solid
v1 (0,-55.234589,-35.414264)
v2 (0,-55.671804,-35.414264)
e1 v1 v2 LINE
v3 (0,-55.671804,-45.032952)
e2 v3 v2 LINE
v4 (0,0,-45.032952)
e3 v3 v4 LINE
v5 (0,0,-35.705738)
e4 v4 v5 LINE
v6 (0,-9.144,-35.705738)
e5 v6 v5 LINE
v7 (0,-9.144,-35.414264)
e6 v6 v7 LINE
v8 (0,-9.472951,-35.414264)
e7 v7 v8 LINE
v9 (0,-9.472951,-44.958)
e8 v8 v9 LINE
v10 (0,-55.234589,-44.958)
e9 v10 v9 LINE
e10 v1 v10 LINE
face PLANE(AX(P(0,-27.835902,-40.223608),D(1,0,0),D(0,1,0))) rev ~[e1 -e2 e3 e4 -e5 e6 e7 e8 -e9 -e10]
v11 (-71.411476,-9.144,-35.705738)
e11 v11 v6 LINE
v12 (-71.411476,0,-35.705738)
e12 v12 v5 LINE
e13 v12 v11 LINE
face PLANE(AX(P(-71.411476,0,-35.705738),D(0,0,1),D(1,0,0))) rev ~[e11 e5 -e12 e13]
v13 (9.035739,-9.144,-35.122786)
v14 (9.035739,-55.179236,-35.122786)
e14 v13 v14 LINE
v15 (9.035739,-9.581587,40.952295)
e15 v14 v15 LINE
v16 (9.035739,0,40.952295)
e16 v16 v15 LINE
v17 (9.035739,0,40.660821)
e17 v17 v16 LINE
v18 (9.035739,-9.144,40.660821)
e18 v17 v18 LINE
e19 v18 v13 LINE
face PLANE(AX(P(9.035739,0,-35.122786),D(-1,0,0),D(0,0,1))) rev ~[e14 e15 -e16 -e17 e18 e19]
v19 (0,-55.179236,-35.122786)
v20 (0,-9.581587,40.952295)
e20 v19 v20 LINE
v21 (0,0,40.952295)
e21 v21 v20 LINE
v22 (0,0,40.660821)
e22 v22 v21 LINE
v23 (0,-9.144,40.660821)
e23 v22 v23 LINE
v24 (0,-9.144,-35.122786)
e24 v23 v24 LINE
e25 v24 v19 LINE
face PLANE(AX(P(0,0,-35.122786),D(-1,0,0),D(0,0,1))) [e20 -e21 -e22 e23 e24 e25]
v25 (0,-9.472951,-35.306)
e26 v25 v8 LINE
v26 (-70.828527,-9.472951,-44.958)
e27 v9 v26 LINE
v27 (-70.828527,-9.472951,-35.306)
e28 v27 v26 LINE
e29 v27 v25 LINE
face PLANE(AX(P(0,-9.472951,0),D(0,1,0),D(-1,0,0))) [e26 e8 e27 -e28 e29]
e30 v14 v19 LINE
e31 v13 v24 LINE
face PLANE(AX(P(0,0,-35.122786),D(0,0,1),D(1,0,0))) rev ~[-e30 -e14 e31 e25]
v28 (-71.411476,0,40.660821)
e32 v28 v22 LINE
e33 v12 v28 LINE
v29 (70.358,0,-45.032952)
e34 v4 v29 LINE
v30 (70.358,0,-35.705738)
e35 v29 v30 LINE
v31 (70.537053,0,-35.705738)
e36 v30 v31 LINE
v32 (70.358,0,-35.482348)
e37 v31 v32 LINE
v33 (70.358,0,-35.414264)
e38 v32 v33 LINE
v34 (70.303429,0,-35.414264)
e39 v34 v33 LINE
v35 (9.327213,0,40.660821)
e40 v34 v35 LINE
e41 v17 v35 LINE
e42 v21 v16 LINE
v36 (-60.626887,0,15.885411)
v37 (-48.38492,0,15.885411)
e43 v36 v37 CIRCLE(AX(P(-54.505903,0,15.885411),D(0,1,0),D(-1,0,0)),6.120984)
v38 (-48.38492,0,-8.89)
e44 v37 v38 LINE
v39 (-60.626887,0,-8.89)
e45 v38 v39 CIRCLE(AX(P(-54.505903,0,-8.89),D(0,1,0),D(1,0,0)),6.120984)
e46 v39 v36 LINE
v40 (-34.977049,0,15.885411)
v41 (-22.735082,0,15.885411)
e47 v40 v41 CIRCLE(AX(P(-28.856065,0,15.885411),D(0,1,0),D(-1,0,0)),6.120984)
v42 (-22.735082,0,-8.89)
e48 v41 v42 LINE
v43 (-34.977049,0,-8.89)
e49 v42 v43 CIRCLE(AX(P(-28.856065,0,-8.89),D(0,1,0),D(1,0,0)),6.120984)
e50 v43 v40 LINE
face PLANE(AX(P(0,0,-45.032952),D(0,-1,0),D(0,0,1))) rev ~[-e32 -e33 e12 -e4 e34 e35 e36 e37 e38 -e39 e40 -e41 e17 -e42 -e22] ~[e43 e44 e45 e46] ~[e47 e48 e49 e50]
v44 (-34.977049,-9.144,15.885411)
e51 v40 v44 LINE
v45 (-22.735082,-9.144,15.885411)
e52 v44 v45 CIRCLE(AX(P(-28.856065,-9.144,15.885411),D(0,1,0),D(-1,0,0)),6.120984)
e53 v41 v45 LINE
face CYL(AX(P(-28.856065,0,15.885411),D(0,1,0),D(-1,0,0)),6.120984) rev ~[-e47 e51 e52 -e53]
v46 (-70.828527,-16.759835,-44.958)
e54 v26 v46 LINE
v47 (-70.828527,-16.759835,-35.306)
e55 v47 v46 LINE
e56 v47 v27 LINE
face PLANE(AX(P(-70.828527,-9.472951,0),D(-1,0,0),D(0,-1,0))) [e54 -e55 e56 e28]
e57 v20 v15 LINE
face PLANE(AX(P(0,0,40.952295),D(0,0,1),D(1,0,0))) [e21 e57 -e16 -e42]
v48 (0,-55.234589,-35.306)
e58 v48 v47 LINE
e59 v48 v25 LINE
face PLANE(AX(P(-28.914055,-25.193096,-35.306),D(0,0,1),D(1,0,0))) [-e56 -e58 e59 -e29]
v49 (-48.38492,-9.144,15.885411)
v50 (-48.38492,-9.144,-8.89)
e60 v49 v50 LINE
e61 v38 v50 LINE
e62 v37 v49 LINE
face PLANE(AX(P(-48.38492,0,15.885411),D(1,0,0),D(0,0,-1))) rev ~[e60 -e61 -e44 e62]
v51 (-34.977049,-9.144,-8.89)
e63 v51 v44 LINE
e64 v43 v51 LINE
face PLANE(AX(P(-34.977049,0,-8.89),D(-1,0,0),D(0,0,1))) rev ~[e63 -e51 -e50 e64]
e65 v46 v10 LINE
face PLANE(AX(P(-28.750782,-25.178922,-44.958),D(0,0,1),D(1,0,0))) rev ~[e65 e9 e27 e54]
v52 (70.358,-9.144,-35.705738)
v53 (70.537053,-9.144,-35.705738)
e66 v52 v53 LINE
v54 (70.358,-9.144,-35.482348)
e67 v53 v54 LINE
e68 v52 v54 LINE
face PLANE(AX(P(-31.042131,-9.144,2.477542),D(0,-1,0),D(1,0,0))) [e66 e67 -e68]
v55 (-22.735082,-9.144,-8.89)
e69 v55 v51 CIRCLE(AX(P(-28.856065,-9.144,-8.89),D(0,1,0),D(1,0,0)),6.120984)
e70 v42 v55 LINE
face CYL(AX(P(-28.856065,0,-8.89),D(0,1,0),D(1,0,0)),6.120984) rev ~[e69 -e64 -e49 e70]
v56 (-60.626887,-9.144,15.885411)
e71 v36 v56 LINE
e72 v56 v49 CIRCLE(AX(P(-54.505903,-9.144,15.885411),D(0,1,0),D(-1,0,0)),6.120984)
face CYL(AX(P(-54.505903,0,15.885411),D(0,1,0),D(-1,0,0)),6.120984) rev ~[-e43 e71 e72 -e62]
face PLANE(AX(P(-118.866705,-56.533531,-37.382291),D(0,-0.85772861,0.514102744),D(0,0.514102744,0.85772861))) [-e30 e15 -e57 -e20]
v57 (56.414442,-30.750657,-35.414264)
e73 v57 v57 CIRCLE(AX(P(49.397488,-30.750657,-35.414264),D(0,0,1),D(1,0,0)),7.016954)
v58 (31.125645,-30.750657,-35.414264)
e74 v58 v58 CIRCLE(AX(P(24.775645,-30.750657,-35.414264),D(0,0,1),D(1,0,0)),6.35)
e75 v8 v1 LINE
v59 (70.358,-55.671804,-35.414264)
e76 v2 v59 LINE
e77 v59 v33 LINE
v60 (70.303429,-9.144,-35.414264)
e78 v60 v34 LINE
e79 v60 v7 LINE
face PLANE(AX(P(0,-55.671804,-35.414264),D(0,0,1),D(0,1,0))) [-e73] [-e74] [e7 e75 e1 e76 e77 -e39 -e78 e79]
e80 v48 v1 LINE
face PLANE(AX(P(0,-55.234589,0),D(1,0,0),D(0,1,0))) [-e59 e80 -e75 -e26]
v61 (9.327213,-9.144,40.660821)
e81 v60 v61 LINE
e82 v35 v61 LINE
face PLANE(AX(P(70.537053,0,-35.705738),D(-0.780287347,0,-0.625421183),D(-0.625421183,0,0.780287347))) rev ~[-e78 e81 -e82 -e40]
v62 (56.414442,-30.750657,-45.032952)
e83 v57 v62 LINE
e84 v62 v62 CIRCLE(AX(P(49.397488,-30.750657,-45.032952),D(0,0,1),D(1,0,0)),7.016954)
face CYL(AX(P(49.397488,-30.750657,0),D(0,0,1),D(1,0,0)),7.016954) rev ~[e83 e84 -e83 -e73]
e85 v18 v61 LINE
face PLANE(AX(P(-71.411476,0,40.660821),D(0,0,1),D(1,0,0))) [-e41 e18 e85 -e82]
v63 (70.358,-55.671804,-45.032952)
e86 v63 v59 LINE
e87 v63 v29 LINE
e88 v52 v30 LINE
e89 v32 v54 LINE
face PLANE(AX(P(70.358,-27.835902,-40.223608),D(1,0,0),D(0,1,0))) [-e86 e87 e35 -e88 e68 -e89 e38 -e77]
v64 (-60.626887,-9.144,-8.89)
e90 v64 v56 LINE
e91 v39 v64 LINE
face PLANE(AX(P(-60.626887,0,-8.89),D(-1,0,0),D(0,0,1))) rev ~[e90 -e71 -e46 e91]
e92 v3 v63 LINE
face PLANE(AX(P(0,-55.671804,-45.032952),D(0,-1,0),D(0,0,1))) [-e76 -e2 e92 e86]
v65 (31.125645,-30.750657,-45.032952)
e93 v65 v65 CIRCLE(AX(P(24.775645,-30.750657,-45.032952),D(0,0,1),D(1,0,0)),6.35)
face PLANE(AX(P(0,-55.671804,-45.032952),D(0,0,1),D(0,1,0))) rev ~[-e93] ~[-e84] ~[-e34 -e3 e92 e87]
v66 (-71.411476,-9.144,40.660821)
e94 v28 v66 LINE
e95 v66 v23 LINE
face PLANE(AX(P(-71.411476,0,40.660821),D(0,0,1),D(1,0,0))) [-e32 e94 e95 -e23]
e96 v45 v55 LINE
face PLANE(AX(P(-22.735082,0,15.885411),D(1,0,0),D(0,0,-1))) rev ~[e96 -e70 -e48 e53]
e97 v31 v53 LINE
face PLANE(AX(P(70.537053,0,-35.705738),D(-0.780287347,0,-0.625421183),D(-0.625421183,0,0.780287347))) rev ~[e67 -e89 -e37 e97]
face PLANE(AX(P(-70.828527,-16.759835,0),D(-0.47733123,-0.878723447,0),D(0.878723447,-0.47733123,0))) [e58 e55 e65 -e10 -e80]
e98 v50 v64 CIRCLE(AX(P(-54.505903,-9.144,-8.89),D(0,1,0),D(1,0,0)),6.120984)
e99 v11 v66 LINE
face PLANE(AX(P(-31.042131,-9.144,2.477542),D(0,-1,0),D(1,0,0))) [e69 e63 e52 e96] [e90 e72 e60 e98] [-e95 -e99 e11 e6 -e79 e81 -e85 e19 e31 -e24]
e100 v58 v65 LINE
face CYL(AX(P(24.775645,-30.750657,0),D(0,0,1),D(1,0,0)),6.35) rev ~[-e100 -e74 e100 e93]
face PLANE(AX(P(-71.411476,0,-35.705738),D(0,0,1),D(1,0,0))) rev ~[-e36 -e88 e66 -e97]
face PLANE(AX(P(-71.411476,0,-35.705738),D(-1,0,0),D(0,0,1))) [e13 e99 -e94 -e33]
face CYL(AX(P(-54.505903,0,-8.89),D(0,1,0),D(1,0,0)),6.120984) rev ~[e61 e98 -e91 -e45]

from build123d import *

# Parameters (mm, degrees)
F0_W         = 80.7386888191
F0_H         = 76.366558671
F1_DEPTH     = 9.144
F2_W         = 55.6718036532
F2_H         = 9.6186883748
F3_DEPTH     = 70.358
F4_W         = 9.0357391164
F4_H         = 76.0750807822
F5_DEPTH     = 55.626
F6_SIZE      = 45.72
F7_T1_DEPTH  = 167.084926268
F8_T1_DEPTH  = 193.8162932759
F9_T4_DEPTH  = 127.8865685488
F10_T4_DEPTH = 246.7691481608
F12_DEPTH    = 44.958
F14_DEPTH    = 35.306
F15_R        = 6.35
F15_R_2      = 7.0169538455
F16_DEPTH    = 55.372


# Not quite as in the source:
# - a fillet or chamfer that OpenCascade refuses, or shapes differently, is made with other operations: its cross-section is extruded or revolved along the edge and cut away or added


with BuildPart() as f1:
    # F0 (on Front) → F1 (new body)
    with BuildSketch(Plane.XZ):
        with Locations((-31.0421311297, 2.4775415659)):
            Rectangle(F0_W, F0_H)
        with BuildLine():
            Line((-60.626886785, -8.890000172), (-60.626886785, 15.8854108304))
            ThreePointArc((-60.626886785, 15.8854108304), (-54.5059032738, 22.0063943416), (-48.3849197626, 15.8854108304))
            Line((-48.3849197626, 15.8854108304), (-48.3849197626, -8.890000172))
            ThreePointArc((-48.3849197626, -8.890000172), (-54.5059032738, -15.0109836832), (-60.626886785, -8.890000172))
        make_face(mode=Mode.SUBTRACT)
        with BuildLine():
            Line((-34.9770486355, -8.890000172), (-34.9770486355, 15.8854108304))
            ThreePointArc((-34.9770486355, 15.8854108304), (-28.8560651243, 22.0063943416), (-22.7350816131, 15.8854108304))
            Line((-22.7350816131, 15.8854108304), (-22.7350816131, -8.890000172))
            ThreePointArc((-22.7350816131, -8.890000172), (-28.8560651243, -15.0109836832), (-34.9770486355, -8.890000172))
        make_face(mode=Mode.SUBTRACT)
        Polygon((70.5370530486, -35.7057377696), (9.3272132799, 40.6608209014), (9.3272132799, -35.7057377696), align=None)
    extrude(amount=F1_DEPTH)

    # F2 (on Right) → F3 (join)
    with BuildSketch(Plane.YZ):
        with Locations((-27.8359018266, -40.2236077935)):
            Rectangle(F2_W, F2_H)
    extrude(amount=F3_DEPTH)

    # F4 (on Front) → F5 (join)
    with BuildSketch(Plane.XZ):
        with Locations((4.5178695582, 2.9147546738)):
            Rectangle(F4_W, F4_H)
    extrude(amount=F5_DEPTH)

    # F6
    f6_edges = [f1.edges().sort_by_distance(p)[0] for p in [
        (4.51787, -55.626, 40.952295),
    ]]
    chamfer(f6_edges, length=F6_SIZE)

    # F7: chamfer of 30.48 on 1 edges, made by hand

    # F7_s2 → F7_t1 (cut)
    with BuildSketch(Plane.YZ.offset(-79.0245935758)):
        Polygon((-34.0733853094, 16.7849097555), (-55.626, -35.2477049351), (-55.626, -4.7677049351), align=None)
    extrude(amount=F7_T1_DEPTH, mode=Mode.SUBTRACT)

    # F8: chamfer of 35.56 on 1 edges, made by hand

    # F8_s2 → F8_t1 (cut)
    with BuildSketch(Plane.YZ.offset(-92.3902770798)):
        Polygon((-8.9286681704, 41.9296268945), (-47.6816081643, -16.0682464206), (-34.0733853094, 16.7849097555), align=None)
    extrude(amount=F8_T1_DEPTH, mode=Mode.SUBTRACT)

    # F9: chamfer of 22.86 on 1 edges, made by hand


with BuildPart() as f9_tool2:
    # F9_s3 → F9_t4 (new body)
    with BuildSketch(Plane.YZ.offset(-59.4254147162)):
        Polygon((-34.9812726375, 2.9391489166), (-56.4297514282, -37.1881325338), (-47.6816081643, -16.0682464206), align=None)
    extrude(amount=F9_T4_DEPTH)

    split(bisect_by=Plane.XY.offset(-35.4142636061), keep=Keep.TOP)


with BuildPart() as f1_1:
    add(f1.part)

    # F9_t1: cut F9_tool2
    add(f9_tool2.part, mode=Mode.SUBTRACT)

    # F10: chamfer of 45.72 on 1 edges, made by hand


with BuildPart() as f10_tool2:
    # F10_s3 → F10_t4 (new body)
    with BuildSketch(Plane.YZ.offset(-118.8667045222)):
        Polygon((-56.5335314452, -37.3822912894), (-9.5806015838, 40.9539395911), (-34.9812726375, 2.9391489166), align=None)
    extrude(amount=F10_T4_DEPTH)

    split(bisect_by=Plane.XY.offset(-35.1227857172), keep=Keep.TOP)


with BuildPart() as f1_2:
    add(f1_1.part)

    # F10_t1: cut F10_tool2
    add(f10_tool2.part, mode=Mode.SUBTRACT)

    # F11 (on Top) → F12 (join)
    with BuildSketch(Plane.XY):
        Polygon((-70.8285272121, -16.7598351836), (0, -55.2345886827), (0, -9.472951293), (-70.8285272121, -9.472951293), align=None)
    extrude(amount=-F12_DEPTH)

    # F13 (on Top) → F14 (cut)
    with BuildSketch(Plane.XY):
        Polygon((0, -9.1814752668), (-71.4114755392, -9.1814752668), (-71.4114755392, -16.4683610201), (0, -55.8175444603), align=None)
    extrude(amount=-F14_DEPTH, mode=Mode.SUBTRACT)

    # F15 (on Top) → F16 (cut)
    with BuildSketch(Plane.XY):
        with Locations((24.775644736, -30.7506565005)):
            Circle(F15_R)
        with Locations((49.3974882285, -30.7506565005)):
            Circle(F15_R_2)
    extrude(amount=-F16_DEPTH, mode=Mode.SUBTRACT)


solid = f1_2.part
